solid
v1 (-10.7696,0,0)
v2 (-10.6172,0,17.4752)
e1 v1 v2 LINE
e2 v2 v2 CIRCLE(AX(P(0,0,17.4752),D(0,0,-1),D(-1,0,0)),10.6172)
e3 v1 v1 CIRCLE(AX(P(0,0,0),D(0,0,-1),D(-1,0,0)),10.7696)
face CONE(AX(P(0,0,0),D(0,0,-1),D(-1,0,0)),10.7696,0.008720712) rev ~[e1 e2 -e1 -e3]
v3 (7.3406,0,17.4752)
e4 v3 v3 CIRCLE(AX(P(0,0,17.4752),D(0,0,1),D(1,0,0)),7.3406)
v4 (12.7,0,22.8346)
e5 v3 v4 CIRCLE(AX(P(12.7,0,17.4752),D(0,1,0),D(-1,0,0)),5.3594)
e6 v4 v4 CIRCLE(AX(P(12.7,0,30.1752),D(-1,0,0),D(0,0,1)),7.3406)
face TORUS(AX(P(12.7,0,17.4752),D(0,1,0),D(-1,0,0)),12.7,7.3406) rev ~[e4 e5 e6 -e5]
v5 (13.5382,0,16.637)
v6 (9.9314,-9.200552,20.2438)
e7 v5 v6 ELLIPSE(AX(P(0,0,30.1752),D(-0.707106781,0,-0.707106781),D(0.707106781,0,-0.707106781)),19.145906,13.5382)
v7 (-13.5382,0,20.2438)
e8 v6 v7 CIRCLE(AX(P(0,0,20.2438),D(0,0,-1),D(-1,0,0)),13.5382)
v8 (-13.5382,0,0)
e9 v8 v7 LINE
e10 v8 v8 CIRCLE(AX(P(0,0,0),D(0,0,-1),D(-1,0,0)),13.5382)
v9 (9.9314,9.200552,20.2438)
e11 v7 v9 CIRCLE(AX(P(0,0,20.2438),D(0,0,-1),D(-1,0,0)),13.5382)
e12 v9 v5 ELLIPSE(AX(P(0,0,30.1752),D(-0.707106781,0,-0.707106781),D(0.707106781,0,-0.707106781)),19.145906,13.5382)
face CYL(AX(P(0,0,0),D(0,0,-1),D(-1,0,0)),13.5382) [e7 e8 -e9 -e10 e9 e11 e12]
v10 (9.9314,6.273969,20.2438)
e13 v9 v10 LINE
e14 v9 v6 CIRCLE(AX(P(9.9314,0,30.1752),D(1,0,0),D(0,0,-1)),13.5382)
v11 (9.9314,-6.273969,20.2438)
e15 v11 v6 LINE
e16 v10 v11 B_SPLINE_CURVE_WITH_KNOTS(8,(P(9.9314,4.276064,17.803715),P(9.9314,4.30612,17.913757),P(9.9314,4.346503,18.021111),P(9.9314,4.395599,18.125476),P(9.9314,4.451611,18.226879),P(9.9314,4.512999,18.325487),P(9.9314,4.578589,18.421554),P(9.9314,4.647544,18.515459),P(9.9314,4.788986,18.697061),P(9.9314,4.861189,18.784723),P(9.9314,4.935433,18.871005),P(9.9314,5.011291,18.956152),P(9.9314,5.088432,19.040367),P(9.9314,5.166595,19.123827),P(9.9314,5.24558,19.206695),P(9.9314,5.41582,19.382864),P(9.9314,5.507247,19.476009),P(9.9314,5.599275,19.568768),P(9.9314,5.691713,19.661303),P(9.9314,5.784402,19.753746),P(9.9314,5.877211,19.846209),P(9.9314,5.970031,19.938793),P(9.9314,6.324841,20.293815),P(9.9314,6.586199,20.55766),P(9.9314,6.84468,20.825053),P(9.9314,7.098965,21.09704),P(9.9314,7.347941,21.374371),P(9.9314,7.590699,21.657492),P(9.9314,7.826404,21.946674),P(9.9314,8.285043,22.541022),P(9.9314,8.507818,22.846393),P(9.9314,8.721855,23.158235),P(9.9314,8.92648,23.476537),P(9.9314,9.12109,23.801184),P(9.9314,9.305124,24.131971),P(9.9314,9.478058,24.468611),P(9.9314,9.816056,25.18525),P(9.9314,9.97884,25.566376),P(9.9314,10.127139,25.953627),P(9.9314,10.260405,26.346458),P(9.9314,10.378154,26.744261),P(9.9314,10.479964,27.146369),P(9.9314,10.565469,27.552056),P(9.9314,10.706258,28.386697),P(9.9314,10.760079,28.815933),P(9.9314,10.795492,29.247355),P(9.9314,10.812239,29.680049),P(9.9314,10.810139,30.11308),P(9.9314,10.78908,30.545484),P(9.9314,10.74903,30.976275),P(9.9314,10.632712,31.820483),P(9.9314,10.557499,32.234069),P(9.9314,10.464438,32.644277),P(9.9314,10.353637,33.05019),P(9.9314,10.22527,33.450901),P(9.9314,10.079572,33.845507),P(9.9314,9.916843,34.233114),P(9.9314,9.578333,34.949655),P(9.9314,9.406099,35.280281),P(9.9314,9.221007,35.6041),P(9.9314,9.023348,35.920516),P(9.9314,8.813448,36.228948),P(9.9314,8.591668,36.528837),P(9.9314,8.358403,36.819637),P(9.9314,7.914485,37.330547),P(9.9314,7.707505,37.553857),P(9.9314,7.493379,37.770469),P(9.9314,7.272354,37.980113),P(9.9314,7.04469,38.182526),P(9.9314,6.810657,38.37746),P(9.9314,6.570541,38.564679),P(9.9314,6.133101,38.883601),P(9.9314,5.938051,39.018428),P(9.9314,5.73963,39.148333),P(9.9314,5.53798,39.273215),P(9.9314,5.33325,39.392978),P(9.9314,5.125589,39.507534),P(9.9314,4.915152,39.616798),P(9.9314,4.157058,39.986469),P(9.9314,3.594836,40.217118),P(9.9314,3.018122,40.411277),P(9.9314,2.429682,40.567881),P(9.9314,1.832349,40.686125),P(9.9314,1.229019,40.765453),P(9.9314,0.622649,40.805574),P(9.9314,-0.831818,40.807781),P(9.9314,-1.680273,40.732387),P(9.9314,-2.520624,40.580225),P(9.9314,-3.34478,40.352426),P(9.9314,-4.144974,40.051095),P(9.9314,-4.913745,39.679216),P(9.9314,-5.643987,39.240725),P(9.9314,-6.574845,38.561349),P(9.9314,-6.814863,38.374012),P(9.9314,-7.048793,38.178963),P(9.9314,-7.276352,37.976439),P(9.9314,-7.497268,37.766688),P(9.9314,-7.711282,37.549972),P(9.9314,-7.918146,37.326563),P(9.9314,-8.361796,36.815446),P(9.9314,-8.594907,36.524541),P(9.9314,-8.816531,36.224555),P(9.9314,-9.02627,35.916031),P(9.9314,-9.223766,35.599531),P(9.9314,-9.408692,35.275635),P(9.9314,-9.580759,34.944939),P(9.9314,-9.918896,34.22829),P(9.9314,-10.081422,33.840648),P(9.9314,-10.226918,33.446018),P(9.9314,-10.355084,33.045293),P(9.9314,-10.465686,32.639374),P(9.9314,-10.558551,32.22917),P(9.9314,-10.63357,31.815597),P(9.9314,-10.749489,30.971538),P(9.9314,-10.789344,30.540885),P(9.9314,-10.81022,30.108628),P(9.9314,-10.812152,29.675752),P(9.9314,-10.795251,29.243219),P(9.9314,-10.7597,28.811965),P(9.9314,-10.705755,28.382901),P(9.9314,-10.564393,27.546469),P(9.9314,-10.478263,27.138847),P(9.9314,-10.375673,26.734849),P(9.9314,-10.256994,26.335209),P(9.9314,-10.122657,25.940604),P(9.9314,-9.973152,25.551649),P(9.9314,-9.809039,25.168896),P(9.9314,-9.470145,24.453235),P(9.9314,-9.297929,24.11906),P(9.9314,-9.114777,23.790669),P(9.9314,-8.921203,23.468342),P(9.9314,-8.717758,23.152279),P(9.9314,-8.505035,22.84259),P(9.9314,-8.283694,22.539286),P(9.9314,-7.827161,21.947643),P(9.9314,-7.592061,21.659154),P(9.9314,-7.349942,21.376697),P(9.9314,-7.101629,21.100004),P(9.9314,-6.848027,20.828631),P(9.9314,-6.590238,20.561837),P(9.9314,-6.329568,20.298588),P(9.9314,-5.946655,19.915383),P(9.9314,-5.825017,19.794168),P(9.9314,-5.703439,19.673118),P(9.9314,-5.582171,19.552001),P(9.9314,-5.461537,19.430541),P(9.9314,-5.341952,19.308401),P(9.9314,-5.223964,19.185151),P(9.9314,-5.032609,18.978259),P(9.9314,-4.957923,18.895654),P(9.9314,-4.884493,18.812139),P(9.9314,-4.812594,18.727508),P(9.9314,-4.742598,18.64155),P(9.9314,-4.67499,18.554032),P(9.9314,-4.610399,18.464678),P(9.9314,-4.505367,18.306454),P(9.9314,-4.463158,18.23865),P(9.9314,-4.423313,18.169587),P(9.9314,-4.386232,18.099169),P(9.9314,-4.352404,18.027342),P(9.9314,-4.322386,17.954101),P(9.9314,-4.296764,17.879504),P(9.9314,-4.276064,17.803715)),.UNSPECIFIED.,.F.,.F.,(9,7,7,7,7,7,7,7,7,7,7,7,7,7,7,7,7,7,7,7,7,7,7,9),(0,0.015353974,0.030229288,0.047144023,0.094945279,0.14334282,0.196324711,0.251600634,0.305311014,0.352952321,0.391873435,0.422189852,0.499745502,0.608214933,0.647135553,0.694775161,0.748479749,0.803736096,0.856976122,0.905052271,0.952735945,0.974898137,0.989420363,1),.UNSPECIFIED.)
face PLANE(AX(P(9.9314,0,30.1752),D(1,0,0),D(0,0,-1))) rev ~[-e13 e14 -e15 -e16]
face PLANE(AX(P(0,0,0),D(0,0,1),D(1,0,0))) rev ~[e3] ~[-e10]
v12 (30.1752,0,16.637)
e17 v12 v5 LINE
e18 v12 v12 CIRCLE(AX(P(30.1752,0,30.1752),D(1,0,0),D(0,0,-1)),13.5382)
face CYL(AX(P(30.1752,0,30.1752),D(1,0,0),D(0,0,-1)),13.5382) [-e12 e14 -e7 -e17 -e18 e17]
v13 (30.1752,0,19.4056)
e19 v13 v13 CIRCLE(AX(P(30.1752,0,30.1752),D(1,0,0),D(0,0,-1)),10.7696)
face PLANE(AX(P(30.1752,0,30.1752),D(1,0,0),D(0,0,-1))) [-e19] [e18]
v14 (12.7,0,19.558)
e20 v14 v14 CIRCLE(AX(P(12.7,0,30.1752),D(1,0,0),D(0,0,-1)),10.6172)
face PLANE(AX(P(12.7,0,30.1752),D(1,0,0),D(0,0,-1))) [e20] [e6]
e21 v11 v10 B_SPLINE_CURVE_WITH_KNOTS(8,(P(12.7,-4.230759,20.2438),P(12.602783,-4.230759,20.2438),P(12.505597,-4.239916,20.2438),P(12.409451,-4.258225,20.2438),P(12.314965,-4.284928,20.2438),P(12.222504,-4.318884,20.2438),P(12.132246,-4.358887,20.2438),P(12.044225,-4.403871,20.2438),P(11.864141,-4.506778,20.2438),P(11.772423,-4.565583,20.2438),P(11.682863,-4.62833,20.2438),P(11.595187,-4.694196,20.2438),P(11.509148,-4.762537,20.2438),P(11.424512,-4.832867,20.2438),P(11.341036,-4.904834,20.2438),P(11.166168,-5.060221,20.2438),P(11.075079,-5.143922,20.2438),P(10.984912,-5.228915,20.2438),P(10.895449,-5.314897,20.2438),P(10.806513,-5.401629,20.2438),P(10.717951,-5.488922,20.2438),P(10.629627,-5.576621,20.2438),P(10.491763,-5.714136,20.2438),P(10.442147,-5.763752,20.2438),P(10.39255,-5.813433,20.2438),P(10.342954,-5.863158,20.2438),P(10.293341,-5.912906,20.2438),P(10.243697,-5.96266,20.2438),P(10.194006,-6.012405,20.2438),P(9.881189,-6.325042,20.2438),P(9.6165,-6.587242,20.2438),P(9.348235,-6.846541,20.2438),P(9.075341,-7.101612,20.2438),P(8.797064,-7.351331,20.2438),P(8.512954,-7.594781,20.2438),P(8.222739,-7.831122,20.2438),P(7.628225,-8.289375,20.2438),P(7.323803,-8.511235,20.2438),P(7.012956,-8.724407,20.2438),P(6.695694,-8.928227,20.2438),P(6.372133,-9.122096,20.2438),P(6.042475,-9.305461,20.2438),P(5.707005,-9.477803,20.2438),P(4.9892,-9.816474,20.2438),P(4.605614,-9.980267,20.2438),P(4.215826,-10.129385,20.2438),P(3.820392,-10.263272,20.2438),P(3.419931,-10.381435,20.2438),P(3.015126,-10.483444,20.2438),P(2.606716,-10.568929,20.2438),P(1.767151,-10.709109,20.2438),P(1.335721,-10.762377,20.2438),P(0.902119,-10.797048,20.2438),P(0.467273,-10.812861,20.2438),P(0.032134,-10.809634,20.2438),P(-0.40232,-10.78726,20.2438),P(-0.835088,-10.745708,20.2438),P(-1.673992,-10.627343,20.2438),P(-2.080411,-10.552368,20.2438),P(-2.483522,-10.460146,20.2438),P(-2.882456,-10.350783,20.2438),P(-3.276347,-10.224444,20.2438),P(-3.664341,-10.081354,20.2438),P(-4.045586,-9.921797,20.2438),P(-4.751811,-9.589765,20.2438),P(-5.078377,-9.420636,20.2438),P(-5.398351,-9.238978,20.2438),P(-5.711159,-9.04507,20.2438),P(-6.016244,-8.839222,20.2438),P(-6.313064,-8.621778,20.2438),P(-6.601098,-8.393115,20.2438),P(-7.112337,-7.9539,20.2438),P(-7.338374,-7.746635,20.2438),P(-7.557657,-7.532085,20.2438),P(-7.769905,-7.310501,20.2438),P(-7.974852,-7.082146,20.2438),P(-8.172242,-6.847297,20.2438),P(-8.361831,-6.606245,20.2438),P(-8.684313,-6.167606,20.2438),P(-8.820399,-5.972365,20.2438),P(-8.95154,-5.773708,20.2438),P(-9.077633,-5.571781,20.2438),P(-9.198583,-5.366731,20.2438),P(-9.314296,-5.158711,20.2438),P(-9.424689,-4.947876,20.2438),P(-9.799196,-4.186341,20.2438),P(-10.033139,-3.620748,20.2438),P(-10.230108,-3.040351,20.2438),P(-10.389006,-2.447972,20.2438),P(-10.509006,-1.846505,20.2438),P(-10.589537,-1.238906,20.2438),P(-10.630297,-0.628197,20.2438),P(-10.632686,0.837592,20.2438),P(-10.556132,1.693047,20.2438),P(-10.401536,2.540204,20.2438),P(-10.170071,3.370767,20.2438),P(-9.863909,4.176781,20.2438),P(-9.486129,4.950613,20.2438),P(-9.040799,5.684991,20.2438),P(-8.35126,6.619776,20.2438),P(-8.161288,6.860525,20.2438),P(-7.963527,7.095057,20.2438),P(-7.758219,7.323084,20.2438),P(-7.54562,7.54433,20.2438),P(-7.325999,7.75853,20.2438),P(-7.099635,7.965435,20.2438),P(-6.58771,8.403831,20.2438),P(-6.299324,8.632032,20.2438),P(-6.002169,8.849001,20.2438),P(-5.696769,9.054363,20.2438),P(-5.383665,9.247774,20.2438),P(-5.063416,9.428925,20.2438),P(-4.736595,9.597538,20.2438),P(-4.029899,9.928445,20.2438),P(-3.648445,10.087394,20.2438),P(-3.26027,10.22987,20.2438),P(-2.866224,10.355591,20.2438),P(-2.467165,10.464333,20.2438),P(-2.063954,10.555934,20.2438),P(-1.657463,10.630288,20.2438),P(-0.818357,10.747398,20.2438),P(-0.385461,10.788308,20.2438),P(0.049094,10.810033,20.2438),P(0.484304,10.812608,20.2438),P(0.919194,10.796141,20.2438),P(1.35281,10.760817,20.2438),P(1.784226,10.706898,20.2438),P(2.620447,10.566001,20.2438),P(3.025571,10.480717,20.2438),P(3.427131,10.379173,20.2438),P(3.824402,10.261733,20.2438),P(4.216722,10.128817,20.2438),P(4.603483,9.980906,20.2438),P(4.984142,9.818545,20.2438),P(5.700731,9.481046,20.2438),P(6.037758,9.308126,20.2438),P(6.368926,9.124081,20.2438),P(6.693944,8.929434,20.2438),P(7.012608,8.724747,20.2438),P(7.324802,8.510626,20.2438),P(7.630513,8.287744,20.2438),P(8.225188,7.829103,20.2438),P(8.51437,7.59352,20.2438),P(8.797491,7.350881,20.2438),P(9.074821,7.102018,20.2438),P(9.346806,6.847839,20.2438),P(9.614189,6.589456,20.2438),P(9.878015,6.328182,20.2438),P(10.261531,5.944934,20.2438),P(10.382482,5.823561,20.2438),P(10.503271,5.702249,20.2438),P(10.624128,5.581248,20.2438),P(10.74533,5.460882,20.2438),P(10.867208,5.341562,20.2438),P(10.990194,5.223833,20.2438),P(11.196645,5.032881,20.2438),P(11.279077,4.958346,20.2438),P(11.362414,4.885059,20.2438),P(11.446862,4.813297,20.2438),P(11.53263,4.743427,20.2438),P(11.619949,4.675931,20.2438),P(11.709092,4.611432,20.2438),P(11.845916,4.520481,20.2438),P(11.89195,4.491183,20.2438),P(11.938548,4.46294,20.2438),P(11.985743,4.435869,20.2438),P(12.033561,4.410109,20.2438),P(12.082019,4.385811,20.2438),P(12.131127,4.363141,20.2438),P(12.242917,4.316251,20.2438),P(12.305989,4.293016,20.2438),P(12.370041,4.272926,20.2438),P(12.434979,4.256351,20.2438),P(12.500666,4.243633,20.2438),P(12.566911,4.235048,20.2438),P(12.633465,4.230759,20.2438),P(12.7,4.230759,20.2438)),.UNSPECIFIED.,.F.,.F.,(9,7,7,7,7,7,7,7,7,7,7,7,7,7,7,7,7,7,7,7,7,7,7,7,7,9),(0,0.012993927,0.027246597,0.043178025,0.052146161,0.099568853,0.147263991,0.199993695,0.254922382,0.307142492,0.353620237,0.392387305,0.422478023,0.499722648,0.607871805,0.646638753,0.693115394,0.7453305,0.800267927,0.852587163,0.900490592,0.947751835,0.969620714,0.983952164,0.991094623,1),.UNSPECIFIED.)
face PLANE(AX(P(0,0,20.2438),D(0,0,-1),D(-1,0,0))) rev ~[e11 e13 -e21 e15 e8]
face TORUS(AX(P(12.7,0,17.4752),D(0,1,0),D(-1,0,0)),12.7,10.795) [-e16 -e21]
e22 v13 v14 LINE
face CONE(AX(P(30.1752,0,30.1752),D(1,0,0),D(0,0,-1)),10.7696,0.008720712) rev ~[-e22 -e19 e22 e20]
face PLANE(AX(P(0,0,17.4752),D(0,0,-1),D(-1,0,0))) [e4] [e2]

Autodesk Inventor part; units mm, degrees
ref_plane "YZ Plane" through (0, 0, 0) normal (1, 0, 0) x (0, 1, 0)
ref_plane "XZ Plane" through (0, 0, 0) normal (0, 1, 0) x (-1, 0, 0)
ref_plane "XY Plane" through (0, 0, 0) normal (0, 0, 1) x (1, 0, 0)
sketch "Sketch1" plane through (0, 0, 0) normal (0, 1, 0) x (-1, 0, 0)
  line L0 (0, 0) -> (0, 17.4752)
  arc A0 (0, 17.4752) -> (-12.7, 30.1752) centre (-12.7, 17.4752) ccw
  line L1 (-12.7, 30.1752) -> (-30.1752, 30.1752)
  line L2 (-12.7, 30.1752) -> (0, 30.1752) construction
  line L3 (0, 30.1752) -> (0, 17.4752) construction
  dimension "d0" = 30.1752
  dimension "d1" = 30.1752
  dimension "d2" = 17.4752
sketch "Sketch2" plane through (0, 0, 0) normal (0, 0, 1) x (1, 0, 0)
  circle A0 centre (0, 0) radius 10.795
  circle A1 centre (0, 0) radius 7.3406
  dimension "d3" = 14.6812
  dimension "d4" = 21.59
sweep "Sweep1" add profiles "Sketch2" path "Sketch1"
sketch "Sketch3" plane through (0, 0, 0) normal (0, 0, -1) x (-1, 0, 0)
  circle A0 centre (0, 0) radius 13.5382
  circle A1 centre (0, 0) radius 10.795 projected
  circle A2 centre (0, 0) radius 9.0678
  dimension "d6" = 27.0764
  dimension "d9" = 18.1356
extrude "Extrusion1" add sketch "Sketch3" against normal blind 20.2438 contours A0 | A1
sketch "Sketch4" plane through (30.1752, 0, 30.1752) normal (1, 0, 0) x (0, 0, -1)
  circle A0 centre (0, 0) radius 7.3406 projected
  circle A1 centre (0, 0) radius 9.0678
  circle A2 centre (0, 0) radius 13.5382
  dimension "d10" = 27.0764
  dimension "d11" = 18.1356
extrude "Extrusion2" add sketch "Sketch4" against normal blind 20.2438 contours A2
sketch "Sketch5" plane through (0, 0, 0) normal (0, 0, -1) x (-1, 0, 0)
  circle A0 centre (0, 0) radius 7.3406 projected
  circle A1 centre (0, 0) radius 10.7696
  dimension "d14" = 21.5392
sketch "Sketch5 outline for Extrusion3" plane through (0, 0, 0) normal (0, 0, -1) x (-1, 0, 0)
  circle A0 centre (0, 0) radius 10.7696
extrude "Extrusion3" cut sketch "Sketch5 outline for Extrusion3" against normal blind 17.4752 draft -0.49966
sketch "Sketch6" plane through (30.1752, 0, 30.1752) normal (1, 0, 0) x (0, 0, -1)
  circle A0 centre (0, 0) radius 7.3406 projected
  circle A1 centre (0, 0) radius 10.7696
  dimension "d17" = 21.5392
sketch "Sketch6 outline for Extrusion4" plane through (30.1752, 0, 30.1752) normal (1, 0, 0) x (0, 0, -1)
  circle A0 centre (0, 0) radius 10.7696
extrude "Extrusion4" cut sketch "Sketch6 outline for Extrusion4" against normal blind 17.4752 draft -0.49966
equation "\"d0\" = G + C1"
equation "\"d1\" = G + C1"
equation "\"d2\" = C1"
equation "\"d3\" = D"
equation "\"d4\" = D + 2 * F1"
equation "\"d6\" = A + 2 * E1"
equation "\"d9\" = D + F1"
equation "\"d7\" = C1 + E1"
equation "\"d10\" = A + 2 * E1"
equation "\"d11\" = D + F1"
equation "\"d12\" = C1 + E1"
equation "\"d14\" = A"
equation "\"d15\" = C1"
equation "\"d17\" = A"
equation "\"d18\" = C1"
equation "\"A\" = 21.5392"
equation "\"C1\" = 17.4752"
equation "\"F1\" = 3.4544"
equation "\"D\" = 14.6812"
equation "\"G\" = 12.7"
equation "\"E1\" = 2.7686"
equation "\"B\" = 21.2344"
equation "\"Size_Designation\" = 0.5"
properties part number "ASTM D 2466 90 Deg Elbow Socket-Type - Schedule 40 1/2" material "PVC-Piping"
